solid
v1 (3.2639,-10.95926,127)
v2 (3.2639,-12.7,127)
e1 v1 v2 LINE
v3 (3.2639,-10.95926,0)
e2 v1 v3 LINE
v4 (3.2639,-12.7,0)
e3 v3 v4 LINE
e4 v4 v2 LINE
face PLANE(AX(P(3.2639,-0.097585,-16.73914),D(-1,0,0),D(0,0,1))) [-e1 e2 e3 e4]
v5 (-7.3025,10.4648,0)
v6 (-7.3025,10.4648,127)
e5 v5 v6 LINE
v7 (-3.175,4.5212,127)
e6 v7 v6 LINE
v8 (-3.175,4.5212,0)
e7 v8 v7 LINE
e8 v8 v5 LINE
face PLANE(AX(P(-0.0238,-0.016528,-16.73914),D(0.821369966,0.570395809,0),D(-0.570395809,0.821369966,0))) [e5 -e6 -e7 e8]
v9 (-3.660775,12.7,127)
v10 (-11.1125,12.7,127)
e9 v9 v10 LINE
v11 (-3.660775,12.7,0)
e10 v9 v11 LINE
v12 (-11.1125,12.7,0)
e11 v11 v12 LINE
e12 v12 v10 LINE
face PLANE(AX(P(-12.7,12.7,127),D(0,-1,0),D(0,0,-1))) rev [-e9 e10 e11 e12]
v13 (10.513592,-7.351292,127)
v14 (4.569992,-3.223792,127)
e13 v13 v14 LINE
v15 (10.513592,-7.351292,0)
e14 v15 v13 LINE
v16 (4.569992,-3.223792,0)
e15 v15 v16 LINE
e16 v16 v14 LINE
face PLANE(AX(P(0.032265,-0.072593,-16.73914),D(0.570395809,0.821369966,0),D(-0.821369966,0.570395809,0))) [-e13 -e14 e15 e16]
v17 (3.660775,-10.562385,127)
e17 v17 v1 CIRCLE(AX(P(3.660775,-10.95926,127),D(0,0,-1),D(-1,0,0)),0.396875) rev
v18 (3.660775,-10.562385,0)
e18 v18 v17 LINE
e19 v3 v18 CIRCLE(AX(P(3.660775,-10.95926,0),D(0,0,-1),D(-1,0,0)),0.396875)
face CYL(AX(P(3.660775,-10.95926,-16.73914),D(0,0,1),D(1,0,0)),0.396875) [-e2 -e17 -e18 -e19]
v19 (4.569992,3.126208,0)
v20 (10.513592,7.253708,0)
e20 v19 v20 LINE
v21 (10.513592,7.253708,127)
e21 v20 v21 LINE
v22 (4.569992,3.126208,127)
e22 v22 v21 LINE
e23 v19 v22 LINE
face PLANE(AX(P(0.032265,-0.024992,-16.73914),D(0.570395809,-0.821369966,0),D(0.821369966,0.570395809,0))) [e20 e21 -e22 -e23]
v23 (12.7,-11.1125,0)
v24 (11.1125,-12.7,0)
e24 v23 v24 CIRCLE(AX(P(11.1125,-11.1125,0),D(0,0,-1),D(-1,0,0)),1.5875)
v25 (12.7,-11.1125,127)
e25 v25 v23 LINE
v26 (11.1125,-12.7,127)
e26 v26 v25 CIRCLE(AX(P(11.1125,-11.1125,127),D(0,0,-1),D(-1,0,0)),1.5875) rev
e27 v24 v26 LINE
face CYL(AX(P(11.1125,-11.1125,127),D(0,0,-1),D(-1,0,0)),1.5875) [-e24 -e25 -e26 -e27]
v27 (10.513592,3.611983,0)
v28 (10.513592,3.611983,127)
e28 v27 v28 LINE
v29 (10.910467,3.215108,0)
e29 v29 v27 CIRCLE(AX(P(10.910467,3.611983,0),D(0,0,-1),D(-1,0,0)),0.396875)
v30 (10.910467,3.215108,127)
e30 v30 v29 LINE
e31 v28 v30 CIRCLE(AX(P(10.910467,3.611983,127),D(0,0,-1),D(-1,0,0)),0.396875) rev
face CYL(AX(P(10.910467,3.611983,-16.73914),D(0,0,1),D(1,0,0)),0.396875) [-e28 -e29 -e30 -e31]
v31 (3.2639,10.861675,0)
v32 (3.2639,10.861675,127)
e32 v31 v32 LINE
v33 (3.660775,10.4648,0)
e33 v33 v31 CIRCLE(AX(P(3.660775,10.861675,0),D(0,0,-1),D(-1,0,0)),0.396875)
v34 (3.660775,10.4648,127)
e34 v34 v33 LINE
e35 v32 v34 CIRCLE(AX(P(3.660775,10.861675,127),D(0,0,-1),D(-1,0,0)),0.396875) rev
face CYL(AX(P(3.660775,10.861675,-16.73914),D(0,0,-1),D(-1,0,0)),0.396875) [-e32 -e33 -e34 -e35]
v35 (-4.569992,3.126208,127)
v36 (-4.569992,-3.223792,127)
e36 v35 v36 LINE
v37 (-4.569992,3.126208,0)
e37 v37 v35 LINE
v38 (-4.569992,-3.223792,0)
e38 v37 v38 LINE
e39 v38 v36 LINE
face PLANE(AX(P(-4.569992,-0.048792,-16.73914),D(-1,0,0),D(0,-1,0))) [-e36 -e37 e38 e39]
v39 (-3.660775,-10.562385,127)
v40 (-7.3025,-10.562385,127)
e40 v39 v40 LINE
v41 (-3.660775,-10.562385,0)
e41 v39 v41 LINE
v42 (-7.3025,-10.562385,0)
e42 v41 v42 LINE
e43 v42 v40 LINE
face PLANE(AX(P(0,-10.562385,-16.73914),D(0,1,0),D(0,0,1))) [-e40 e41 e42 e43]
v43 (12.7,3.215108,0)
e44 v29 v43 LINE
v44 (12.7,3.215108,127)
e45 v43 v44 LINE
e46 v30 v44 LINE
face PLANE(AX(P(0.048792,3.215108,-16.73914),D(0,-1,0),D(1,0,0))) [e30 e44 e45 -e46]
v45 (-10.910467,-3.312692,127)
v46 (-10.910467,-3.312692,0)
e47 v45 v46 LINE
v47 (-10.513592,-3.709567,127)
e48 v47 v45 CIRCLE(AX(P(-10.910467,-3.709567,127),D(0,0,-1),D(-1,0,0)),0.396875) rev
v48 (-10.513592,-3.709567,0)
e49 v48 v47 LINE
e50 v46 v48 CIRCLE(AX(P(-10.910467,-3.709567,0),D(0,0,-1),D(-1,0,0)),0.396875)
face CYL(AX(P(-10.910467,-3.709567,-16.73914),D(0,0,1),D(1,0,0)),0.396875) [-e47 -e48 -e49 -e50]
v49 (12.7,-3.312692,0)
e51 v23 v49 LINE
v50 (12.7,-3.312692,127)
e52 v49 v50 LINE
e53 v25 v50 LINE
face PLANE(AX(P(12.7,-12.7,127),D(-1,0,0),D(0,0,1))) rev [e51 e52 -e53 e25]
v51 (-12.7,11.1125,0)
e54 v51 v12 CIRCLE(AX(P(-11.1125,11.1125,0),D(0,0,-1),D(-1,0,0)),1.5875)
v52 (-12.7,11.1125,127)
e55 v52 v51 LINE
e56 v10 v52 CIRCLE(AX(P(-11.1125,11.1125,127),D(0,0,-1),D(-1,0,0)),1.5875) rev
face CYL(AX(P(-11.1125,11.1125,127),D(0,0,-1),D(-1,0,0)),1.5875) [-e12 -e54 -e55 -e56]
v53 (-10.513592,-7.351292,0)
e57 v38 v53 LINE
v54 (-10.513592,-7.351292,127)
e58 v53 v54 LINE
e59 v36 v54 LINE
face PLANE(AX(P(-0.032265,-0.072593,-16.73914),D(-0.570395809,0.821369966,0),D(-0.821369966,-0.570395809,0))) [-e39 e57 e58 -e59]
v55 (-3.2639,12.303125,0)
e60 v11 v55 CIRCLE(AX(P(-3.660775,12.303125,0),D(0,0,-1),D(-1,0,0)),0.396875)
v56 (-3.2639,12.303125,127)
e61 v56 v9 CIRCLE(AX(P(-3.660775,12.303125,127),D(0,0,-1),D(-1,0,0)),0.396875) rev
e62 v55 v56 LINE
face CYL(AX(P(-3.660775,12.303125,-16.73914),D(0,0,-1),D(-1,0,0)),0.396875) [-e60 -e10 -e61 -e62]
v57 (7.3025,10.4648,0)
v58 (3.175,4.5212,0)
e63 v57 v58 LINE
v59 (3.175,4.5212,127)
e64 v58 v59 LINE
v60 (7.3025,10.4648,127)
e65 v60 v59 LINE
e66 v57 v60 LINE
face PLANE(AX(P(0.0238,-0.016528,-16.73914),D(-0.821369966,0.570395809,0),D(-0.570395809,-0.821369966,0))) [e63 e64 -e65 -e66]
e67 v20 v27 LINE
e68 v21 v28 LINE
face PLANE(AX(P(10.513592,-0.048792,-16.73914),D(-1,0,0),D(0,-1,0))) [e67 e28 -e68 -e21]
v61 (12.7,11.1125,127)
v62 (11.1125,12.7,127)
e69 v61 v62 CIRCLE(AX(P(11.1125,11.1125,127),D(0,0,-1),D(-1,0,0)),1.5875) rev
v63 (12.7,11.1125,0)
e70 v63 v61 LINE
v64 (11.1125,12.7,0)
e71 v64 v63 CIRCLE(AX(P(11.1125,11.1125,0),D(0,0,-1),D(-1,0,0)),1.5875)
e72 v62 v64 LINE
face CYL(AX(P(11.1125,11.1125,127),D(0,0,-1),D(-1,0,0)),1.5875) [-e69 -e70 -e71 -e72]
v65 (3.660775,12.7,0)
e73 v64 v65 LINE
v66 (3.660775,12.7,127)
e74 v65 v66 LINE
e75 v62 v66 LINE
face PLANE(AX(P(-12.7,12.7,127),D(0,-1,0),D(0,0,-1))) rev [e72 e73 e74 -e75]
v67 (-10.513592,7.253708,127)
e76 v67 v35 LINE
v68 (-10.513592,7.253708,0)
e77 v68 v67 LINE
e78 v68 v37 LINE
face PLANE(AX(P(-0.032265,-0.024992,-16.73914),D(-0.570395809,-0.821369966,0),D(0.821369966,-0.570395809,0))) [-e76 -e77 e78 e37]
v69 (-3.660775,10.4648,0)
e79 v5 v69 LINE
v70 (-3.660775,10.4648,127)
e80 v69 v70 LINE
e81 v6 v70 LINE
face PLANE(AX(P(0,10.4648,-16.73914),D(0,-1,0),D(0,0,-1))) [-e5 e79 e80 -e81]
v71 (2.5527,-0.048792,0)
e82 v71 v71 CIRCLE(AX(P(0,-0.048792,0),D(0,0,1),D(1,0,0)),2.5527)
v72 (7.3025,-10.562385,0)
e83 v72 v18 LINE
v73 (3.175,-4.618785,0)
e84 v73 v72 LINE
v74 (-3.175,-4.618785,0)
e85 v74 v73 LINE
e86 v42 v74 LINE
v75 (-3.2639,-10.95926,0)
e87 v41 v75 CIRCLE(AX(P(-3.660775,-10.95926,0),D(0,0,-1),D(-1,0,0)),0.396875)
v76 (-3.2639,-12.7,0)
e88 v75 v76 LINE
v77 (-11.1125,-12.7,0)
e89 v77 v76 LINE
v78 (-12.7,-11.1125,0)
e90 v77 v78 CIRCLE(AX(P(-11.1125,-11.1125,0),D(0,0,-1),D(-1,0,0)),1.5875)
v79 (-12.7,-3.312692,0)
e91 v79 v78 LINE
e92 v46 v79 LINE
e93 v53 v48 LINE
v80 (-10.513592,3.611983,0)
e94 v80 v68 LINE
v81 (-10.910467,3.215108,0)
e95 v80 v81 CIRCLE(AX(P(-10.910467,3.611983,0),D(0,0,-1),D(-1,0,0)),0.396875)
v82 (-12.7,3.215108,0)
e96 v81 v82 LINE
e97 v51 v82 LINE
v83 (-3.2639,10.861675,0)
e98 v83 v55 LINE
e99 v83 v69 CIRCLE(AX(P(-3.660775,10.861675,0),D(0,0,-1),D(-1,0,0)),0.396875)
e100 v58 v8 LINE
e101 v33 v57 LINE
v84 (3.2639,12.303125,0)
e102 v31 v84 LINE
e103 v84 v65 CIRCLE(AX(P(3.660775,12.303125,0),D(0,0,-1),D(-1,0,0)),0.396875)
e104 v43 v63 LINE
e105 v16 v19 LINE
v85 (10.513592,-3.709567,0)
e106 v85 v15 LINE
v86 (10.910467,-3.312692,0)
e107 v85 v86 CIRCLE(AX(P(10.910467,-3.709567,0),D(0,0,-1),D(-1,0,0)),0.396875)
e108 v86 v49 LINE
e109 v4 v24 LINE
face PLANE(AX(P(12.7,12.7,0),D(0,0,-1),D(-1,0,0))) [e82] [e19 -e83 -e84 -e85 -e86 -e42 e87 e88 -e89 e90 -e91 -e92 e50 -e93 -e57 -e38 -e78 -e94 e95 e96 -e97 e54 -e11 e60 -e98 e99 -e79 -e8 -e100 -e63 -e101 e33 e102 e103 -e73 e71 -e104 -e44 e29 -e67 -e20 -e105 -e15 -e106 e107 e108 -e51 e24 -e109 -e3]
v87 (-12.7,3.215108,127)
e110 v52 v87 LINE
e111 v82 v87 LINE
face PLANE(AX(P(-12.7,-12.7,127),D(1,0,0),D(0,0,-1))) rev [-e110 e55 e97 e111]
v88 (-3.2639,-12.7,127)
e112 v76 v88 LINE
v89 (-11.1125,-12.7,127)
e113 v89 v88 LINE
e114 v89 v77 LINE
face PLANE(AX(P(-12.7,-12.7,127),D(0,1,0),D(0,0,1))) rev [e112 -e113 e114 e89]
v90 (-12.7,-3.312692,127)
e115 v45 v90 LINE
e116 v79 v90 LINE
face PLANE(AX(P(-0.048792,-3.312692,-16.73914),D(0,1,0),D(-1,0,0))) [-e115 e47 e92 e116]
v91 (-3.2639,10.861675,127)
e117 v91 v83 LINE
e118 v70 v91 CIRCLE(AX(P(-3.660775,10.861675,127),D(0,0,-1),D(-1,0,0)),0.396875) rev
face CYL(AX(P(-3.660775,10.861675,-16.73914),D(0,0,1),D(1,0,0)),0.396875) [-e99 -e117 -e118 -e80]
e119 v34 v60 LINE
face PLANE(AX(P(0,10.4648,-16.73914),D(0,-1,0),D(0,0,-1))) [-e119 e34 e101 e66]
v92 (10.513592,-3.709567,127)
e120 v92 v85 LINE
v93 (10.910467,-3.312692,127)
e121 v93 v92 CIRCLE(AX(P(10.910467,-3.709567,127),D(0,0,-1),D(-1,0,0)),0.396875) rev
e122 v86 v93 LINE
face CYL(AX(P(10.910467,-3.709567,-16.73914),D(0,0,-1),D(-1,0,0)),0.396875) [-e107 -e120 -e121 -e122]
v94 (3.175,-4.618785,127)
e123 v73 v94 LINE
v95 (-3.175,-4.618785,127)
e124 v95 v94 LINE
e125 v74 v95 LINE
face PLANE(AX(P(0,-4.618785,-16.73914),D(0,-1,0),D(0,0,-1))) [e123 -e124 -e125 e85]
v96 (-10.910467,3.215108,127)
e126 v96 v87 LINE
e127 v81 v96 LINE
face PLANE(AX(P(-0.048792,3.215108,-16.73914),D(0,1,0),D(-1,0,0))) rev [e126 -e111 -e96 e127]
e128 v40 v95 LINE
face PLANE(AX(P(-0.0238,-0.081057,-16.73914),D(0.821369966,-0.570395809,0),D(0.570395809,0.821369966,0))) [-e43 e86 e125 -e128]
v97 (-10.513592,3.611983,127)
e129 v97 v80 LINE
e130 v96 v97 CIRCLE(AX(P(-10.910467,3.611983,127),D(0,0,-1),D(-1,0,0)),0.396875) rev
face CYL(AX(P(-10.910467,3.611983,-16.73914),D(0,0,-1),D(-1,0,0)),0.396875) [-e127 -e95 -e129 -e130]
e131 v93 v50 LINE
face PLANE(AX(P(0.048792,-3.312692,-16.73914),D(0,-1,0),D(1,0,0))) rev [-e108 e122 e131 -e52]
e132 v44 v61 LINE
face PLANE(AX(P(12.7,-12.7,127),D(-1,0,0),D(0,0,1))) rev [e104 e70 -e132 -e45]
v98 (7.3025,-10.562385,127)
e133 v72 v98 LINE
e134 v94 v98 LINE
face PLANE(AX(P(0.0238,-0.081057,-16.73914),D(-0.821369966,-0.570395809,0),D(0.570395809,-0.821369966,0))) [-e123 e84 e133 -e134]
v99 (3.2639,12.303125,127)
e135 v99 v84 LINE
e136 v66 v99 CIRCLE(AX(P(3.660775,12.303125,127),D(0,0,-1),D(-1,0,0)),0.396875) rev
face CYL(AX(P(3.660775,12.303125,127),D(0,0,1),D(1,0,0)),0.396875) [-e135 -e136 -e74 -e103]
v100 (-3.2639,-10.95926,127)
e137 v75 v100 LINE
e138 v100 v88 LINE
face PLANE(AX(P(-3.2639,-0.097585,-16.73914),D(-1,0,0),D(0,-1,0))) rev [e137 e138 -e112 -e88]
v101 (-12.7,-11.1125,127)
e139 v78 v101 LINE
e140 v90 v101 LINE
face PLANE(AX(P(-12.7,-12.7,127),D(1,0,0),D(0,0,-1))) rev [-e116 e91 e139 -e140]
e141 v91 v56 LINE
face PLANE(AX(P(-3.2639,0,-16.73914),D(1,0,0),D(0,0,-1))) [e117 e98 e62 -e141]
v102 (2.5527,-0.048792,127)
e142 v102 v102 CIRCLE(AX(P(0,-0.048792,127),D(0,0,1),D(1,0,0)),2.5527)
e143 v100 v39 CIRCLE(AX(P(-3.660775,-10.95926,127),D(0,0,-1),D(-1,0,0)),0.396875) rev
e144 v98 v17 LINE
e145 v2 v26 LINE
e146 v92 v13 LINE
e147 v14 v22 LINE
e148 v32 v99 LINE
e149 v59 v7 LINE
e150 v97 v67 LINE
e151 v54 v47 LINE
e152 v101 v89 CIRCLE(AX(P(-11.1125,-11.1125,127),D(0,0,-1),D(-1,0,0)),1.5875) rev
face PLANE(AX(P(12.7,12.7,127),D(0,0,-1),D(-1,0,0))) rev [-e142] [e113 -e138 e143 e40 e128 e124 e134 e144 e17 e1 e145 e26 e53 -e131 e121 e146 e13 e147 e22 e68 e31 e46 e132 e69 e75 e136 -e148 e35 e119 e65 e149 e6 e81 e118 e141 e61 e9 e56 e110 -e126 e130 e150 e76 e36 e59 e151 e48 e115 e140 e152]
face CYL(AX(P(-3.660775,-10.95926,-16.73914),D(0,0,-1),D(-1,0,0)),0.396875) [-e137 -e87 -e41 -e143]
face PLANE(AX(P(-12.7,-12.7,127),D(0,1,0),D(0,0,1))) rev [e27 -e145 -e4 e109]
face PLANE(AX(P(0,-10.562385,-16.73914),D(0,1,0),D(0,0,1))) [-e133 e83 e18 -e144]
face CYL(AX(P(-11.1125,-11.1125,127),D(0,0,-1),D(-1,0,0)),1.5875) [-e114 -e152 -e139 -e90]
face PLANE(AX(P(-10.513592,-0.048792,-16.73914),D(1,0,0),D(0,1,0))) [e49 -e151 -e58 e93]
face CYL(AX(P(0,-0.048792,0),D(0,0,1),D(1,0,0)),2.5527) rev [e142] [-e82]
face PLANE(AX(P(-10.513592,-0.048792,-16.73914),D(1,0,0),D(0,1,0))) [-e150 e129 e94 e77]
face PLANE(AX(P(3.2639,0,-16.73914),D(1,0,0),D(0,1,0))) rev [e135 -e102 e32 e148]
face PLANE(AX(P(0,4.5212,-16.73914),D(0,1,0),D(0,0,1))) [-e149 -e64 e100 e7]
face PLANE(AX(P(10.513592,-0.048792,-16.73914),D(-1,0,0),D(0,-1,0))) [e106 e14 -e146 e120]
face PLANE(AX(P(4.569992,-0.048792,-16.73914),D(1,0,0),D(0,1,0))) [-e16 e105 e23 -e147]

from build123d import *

# Parameters (mm, degrees)
SKETCH1_W           = 25.4
SKETCH1_H           = 25.4
BOSS_EXTRUDE1_DEPTH = 127
FILLET1_R           = 1.5875
HOLE1_OUTLINE_R     = 2.5527
HOLE1_DEPTH         = 127
SKETCH7_W           = 6.5278
SKETCH7_H           = 2.2352
CUT_EXTRUDE2_DEPTH  = 127
FILLET4_R           = 0.396875
CIRPATTERN2_DEPTH   = 127


# Read off the part's stored shape, not the designer's step: Hole1, CirPattern2
with BuildPart() as part:
    # Sketch1 → Boss-Extrude1 (new body)
    with BuildSketch(Plane.XY):
        Rectangle(SKETCH1_W, SKETCH1_H)
    extrude(amount=BOSS_EXTRUDE1_DEPTH)

    # Fillet1
    fillet1_edges = [part.edges().sort_by_distance(p)[0] for p in [
        (12.7, -12.7, 63.5),
        (-12.7, -12.7, 63.5),
        (-12.7, 12.7, 63.5),
        (12.7, 12.7, 63.5),
    ]]
    fillet(fillet1_edges, radius=FILLET1_R)

    # Hole1 outline → Hole1 (cut)
    with BuildSketch(Plane.XY):
        with Locations((0, -0.048792482)):
            Circle(HOLE1_OUTLINE_R)
    extrude(amount=HOLE1_DEPTH, mode=Mode.SUBTRACT)

    # Sketch7 → Cut-Extrude2 (cut)
    with BuildSketch(Plane.XY.offset(127)):
        with Locations((0, 11.5824)):
            Rectangle(SKETCH7_W, SKETCH7_H)
        Polygon((-3.175, 4.5212), (-7.3025, 10.4648), (7.3025, 10.4648), (3.175, 4.5212), align=None)
    extrude(amount=-CUT_EXTRUDE2_DEPTH, mode=Mode.SUBTRACT)

    # Fillet4
    fillet4_edges = [part.edges().sort_by_distance(p)[0] for p in [
        (-3.2639, 10.4648, 63.5),
        (-3.2639, 12.7, 63.5),
        (3.2639, 12.7, 63.5),
        (3.2639, 10.4648, 63.5),
    ]]
    fillet(fillet4_edges, radius=FILLET4_R)

    # CirPattern2 outline → CirPattern2 (cut)
    with BuildSketch(Plane.XY):
        with BuildLine():
            ThreePointArc((-3.660775, -10.562384964), (-3.380141996, -10.67862696), (-3.2639, -10.959259964))
            Line((-3.2639, -10.959259964), (-3.2639, -12.7))
            Line((-3.2639, -12.7), (3.2639, -12.7))
            Line((3.2639, -12.7), (3.2639, -10.959259964))
            ThreePointArc((3.2639, -10.959259964), (3.380141996, -10.67862696), (3.660775, -10.562384964))
            Line((3.660775, -10.562384964), (7.3025, -10.562384964))
            Line((7.3025, -10.562384964), (3.175, -4.618784964))
            Line((3.175, -4.618784964), (-3.175, -4.618784964))
            Line((-3.175, -4.618784964), (-7.3025, -10.562384964))
            Line((-7.3025, -10.562384964), (-3.660775, -10.562384964))
        make_face()
        with BuildLine():
            Line((-12.7, -3.312692482), (-10.910467482, -3.312692482))
            ThreePointArc((-10.910467482, -3.312692482), (-10.629834478, -3.428934478), (-10.513592482, -3.709567482))
            Line((-10.513592482, -3.709567482), (-10.513592482, -7.351292482))
            Line((-10.513592482, -7.351292482), (-4.569992482, -3.223792482))
            Line((-4.569992482, -3.223792482), (-4.569992482, 3.126207518))
            Line((-4.569992482, 3.126207518), (-10.513592482, 7.253707518))
            Line((-10.513592482, 7.253707518), (-10.513592482, 3.611982518))
            ThreePointArc((-10.513592482, 3.611982518), (-10.629834478, 3.331349514), (-10.910467482, 3.215107518))
            Line((-10.910467482, 3.215107518), (-12.7, 3.215107518))
            Line((-12.7, 3.215107518), (-12.7, -3.312692482))
        make_face()
        with BuildLine():
            ThreePointArc((10.513592482, -3.709567482), (10.629834478, -3.428934478), (10.910467482, -3.312692482))
            Line((10.910467482, -3.312692482), (12.7, -3.312692482))
            Line((12.7, -3.312692482), (12.7, 3.215107518))
            Line((12.7, 3.215107518), (10.910467482, 3.215107518))
            ThreePointArc((10.910467482, 3.215107518), (10.629834478, 3.331349514), (10.513592482, 3.611982518))
            Line((10.513592482, 3.611982518), (10.513592482, 7.253707518))
            Line((10.513592482, 7.253707518), (4.569992482, 3.126207518))
            Line((4.569992482, 3.126207518), (4.569992482, -3.223792482))
            Line((4.569992482, -3.223792482), (10.513592482, -7.351292482))
            Line((10.513592482, -7.351292482), (10.513592482, -3.709567482))
        make_face()
    extrude(amount=CIRPATTERN2_DEPTH, mode=Mode.SUBTRACT)


solid = part.part
